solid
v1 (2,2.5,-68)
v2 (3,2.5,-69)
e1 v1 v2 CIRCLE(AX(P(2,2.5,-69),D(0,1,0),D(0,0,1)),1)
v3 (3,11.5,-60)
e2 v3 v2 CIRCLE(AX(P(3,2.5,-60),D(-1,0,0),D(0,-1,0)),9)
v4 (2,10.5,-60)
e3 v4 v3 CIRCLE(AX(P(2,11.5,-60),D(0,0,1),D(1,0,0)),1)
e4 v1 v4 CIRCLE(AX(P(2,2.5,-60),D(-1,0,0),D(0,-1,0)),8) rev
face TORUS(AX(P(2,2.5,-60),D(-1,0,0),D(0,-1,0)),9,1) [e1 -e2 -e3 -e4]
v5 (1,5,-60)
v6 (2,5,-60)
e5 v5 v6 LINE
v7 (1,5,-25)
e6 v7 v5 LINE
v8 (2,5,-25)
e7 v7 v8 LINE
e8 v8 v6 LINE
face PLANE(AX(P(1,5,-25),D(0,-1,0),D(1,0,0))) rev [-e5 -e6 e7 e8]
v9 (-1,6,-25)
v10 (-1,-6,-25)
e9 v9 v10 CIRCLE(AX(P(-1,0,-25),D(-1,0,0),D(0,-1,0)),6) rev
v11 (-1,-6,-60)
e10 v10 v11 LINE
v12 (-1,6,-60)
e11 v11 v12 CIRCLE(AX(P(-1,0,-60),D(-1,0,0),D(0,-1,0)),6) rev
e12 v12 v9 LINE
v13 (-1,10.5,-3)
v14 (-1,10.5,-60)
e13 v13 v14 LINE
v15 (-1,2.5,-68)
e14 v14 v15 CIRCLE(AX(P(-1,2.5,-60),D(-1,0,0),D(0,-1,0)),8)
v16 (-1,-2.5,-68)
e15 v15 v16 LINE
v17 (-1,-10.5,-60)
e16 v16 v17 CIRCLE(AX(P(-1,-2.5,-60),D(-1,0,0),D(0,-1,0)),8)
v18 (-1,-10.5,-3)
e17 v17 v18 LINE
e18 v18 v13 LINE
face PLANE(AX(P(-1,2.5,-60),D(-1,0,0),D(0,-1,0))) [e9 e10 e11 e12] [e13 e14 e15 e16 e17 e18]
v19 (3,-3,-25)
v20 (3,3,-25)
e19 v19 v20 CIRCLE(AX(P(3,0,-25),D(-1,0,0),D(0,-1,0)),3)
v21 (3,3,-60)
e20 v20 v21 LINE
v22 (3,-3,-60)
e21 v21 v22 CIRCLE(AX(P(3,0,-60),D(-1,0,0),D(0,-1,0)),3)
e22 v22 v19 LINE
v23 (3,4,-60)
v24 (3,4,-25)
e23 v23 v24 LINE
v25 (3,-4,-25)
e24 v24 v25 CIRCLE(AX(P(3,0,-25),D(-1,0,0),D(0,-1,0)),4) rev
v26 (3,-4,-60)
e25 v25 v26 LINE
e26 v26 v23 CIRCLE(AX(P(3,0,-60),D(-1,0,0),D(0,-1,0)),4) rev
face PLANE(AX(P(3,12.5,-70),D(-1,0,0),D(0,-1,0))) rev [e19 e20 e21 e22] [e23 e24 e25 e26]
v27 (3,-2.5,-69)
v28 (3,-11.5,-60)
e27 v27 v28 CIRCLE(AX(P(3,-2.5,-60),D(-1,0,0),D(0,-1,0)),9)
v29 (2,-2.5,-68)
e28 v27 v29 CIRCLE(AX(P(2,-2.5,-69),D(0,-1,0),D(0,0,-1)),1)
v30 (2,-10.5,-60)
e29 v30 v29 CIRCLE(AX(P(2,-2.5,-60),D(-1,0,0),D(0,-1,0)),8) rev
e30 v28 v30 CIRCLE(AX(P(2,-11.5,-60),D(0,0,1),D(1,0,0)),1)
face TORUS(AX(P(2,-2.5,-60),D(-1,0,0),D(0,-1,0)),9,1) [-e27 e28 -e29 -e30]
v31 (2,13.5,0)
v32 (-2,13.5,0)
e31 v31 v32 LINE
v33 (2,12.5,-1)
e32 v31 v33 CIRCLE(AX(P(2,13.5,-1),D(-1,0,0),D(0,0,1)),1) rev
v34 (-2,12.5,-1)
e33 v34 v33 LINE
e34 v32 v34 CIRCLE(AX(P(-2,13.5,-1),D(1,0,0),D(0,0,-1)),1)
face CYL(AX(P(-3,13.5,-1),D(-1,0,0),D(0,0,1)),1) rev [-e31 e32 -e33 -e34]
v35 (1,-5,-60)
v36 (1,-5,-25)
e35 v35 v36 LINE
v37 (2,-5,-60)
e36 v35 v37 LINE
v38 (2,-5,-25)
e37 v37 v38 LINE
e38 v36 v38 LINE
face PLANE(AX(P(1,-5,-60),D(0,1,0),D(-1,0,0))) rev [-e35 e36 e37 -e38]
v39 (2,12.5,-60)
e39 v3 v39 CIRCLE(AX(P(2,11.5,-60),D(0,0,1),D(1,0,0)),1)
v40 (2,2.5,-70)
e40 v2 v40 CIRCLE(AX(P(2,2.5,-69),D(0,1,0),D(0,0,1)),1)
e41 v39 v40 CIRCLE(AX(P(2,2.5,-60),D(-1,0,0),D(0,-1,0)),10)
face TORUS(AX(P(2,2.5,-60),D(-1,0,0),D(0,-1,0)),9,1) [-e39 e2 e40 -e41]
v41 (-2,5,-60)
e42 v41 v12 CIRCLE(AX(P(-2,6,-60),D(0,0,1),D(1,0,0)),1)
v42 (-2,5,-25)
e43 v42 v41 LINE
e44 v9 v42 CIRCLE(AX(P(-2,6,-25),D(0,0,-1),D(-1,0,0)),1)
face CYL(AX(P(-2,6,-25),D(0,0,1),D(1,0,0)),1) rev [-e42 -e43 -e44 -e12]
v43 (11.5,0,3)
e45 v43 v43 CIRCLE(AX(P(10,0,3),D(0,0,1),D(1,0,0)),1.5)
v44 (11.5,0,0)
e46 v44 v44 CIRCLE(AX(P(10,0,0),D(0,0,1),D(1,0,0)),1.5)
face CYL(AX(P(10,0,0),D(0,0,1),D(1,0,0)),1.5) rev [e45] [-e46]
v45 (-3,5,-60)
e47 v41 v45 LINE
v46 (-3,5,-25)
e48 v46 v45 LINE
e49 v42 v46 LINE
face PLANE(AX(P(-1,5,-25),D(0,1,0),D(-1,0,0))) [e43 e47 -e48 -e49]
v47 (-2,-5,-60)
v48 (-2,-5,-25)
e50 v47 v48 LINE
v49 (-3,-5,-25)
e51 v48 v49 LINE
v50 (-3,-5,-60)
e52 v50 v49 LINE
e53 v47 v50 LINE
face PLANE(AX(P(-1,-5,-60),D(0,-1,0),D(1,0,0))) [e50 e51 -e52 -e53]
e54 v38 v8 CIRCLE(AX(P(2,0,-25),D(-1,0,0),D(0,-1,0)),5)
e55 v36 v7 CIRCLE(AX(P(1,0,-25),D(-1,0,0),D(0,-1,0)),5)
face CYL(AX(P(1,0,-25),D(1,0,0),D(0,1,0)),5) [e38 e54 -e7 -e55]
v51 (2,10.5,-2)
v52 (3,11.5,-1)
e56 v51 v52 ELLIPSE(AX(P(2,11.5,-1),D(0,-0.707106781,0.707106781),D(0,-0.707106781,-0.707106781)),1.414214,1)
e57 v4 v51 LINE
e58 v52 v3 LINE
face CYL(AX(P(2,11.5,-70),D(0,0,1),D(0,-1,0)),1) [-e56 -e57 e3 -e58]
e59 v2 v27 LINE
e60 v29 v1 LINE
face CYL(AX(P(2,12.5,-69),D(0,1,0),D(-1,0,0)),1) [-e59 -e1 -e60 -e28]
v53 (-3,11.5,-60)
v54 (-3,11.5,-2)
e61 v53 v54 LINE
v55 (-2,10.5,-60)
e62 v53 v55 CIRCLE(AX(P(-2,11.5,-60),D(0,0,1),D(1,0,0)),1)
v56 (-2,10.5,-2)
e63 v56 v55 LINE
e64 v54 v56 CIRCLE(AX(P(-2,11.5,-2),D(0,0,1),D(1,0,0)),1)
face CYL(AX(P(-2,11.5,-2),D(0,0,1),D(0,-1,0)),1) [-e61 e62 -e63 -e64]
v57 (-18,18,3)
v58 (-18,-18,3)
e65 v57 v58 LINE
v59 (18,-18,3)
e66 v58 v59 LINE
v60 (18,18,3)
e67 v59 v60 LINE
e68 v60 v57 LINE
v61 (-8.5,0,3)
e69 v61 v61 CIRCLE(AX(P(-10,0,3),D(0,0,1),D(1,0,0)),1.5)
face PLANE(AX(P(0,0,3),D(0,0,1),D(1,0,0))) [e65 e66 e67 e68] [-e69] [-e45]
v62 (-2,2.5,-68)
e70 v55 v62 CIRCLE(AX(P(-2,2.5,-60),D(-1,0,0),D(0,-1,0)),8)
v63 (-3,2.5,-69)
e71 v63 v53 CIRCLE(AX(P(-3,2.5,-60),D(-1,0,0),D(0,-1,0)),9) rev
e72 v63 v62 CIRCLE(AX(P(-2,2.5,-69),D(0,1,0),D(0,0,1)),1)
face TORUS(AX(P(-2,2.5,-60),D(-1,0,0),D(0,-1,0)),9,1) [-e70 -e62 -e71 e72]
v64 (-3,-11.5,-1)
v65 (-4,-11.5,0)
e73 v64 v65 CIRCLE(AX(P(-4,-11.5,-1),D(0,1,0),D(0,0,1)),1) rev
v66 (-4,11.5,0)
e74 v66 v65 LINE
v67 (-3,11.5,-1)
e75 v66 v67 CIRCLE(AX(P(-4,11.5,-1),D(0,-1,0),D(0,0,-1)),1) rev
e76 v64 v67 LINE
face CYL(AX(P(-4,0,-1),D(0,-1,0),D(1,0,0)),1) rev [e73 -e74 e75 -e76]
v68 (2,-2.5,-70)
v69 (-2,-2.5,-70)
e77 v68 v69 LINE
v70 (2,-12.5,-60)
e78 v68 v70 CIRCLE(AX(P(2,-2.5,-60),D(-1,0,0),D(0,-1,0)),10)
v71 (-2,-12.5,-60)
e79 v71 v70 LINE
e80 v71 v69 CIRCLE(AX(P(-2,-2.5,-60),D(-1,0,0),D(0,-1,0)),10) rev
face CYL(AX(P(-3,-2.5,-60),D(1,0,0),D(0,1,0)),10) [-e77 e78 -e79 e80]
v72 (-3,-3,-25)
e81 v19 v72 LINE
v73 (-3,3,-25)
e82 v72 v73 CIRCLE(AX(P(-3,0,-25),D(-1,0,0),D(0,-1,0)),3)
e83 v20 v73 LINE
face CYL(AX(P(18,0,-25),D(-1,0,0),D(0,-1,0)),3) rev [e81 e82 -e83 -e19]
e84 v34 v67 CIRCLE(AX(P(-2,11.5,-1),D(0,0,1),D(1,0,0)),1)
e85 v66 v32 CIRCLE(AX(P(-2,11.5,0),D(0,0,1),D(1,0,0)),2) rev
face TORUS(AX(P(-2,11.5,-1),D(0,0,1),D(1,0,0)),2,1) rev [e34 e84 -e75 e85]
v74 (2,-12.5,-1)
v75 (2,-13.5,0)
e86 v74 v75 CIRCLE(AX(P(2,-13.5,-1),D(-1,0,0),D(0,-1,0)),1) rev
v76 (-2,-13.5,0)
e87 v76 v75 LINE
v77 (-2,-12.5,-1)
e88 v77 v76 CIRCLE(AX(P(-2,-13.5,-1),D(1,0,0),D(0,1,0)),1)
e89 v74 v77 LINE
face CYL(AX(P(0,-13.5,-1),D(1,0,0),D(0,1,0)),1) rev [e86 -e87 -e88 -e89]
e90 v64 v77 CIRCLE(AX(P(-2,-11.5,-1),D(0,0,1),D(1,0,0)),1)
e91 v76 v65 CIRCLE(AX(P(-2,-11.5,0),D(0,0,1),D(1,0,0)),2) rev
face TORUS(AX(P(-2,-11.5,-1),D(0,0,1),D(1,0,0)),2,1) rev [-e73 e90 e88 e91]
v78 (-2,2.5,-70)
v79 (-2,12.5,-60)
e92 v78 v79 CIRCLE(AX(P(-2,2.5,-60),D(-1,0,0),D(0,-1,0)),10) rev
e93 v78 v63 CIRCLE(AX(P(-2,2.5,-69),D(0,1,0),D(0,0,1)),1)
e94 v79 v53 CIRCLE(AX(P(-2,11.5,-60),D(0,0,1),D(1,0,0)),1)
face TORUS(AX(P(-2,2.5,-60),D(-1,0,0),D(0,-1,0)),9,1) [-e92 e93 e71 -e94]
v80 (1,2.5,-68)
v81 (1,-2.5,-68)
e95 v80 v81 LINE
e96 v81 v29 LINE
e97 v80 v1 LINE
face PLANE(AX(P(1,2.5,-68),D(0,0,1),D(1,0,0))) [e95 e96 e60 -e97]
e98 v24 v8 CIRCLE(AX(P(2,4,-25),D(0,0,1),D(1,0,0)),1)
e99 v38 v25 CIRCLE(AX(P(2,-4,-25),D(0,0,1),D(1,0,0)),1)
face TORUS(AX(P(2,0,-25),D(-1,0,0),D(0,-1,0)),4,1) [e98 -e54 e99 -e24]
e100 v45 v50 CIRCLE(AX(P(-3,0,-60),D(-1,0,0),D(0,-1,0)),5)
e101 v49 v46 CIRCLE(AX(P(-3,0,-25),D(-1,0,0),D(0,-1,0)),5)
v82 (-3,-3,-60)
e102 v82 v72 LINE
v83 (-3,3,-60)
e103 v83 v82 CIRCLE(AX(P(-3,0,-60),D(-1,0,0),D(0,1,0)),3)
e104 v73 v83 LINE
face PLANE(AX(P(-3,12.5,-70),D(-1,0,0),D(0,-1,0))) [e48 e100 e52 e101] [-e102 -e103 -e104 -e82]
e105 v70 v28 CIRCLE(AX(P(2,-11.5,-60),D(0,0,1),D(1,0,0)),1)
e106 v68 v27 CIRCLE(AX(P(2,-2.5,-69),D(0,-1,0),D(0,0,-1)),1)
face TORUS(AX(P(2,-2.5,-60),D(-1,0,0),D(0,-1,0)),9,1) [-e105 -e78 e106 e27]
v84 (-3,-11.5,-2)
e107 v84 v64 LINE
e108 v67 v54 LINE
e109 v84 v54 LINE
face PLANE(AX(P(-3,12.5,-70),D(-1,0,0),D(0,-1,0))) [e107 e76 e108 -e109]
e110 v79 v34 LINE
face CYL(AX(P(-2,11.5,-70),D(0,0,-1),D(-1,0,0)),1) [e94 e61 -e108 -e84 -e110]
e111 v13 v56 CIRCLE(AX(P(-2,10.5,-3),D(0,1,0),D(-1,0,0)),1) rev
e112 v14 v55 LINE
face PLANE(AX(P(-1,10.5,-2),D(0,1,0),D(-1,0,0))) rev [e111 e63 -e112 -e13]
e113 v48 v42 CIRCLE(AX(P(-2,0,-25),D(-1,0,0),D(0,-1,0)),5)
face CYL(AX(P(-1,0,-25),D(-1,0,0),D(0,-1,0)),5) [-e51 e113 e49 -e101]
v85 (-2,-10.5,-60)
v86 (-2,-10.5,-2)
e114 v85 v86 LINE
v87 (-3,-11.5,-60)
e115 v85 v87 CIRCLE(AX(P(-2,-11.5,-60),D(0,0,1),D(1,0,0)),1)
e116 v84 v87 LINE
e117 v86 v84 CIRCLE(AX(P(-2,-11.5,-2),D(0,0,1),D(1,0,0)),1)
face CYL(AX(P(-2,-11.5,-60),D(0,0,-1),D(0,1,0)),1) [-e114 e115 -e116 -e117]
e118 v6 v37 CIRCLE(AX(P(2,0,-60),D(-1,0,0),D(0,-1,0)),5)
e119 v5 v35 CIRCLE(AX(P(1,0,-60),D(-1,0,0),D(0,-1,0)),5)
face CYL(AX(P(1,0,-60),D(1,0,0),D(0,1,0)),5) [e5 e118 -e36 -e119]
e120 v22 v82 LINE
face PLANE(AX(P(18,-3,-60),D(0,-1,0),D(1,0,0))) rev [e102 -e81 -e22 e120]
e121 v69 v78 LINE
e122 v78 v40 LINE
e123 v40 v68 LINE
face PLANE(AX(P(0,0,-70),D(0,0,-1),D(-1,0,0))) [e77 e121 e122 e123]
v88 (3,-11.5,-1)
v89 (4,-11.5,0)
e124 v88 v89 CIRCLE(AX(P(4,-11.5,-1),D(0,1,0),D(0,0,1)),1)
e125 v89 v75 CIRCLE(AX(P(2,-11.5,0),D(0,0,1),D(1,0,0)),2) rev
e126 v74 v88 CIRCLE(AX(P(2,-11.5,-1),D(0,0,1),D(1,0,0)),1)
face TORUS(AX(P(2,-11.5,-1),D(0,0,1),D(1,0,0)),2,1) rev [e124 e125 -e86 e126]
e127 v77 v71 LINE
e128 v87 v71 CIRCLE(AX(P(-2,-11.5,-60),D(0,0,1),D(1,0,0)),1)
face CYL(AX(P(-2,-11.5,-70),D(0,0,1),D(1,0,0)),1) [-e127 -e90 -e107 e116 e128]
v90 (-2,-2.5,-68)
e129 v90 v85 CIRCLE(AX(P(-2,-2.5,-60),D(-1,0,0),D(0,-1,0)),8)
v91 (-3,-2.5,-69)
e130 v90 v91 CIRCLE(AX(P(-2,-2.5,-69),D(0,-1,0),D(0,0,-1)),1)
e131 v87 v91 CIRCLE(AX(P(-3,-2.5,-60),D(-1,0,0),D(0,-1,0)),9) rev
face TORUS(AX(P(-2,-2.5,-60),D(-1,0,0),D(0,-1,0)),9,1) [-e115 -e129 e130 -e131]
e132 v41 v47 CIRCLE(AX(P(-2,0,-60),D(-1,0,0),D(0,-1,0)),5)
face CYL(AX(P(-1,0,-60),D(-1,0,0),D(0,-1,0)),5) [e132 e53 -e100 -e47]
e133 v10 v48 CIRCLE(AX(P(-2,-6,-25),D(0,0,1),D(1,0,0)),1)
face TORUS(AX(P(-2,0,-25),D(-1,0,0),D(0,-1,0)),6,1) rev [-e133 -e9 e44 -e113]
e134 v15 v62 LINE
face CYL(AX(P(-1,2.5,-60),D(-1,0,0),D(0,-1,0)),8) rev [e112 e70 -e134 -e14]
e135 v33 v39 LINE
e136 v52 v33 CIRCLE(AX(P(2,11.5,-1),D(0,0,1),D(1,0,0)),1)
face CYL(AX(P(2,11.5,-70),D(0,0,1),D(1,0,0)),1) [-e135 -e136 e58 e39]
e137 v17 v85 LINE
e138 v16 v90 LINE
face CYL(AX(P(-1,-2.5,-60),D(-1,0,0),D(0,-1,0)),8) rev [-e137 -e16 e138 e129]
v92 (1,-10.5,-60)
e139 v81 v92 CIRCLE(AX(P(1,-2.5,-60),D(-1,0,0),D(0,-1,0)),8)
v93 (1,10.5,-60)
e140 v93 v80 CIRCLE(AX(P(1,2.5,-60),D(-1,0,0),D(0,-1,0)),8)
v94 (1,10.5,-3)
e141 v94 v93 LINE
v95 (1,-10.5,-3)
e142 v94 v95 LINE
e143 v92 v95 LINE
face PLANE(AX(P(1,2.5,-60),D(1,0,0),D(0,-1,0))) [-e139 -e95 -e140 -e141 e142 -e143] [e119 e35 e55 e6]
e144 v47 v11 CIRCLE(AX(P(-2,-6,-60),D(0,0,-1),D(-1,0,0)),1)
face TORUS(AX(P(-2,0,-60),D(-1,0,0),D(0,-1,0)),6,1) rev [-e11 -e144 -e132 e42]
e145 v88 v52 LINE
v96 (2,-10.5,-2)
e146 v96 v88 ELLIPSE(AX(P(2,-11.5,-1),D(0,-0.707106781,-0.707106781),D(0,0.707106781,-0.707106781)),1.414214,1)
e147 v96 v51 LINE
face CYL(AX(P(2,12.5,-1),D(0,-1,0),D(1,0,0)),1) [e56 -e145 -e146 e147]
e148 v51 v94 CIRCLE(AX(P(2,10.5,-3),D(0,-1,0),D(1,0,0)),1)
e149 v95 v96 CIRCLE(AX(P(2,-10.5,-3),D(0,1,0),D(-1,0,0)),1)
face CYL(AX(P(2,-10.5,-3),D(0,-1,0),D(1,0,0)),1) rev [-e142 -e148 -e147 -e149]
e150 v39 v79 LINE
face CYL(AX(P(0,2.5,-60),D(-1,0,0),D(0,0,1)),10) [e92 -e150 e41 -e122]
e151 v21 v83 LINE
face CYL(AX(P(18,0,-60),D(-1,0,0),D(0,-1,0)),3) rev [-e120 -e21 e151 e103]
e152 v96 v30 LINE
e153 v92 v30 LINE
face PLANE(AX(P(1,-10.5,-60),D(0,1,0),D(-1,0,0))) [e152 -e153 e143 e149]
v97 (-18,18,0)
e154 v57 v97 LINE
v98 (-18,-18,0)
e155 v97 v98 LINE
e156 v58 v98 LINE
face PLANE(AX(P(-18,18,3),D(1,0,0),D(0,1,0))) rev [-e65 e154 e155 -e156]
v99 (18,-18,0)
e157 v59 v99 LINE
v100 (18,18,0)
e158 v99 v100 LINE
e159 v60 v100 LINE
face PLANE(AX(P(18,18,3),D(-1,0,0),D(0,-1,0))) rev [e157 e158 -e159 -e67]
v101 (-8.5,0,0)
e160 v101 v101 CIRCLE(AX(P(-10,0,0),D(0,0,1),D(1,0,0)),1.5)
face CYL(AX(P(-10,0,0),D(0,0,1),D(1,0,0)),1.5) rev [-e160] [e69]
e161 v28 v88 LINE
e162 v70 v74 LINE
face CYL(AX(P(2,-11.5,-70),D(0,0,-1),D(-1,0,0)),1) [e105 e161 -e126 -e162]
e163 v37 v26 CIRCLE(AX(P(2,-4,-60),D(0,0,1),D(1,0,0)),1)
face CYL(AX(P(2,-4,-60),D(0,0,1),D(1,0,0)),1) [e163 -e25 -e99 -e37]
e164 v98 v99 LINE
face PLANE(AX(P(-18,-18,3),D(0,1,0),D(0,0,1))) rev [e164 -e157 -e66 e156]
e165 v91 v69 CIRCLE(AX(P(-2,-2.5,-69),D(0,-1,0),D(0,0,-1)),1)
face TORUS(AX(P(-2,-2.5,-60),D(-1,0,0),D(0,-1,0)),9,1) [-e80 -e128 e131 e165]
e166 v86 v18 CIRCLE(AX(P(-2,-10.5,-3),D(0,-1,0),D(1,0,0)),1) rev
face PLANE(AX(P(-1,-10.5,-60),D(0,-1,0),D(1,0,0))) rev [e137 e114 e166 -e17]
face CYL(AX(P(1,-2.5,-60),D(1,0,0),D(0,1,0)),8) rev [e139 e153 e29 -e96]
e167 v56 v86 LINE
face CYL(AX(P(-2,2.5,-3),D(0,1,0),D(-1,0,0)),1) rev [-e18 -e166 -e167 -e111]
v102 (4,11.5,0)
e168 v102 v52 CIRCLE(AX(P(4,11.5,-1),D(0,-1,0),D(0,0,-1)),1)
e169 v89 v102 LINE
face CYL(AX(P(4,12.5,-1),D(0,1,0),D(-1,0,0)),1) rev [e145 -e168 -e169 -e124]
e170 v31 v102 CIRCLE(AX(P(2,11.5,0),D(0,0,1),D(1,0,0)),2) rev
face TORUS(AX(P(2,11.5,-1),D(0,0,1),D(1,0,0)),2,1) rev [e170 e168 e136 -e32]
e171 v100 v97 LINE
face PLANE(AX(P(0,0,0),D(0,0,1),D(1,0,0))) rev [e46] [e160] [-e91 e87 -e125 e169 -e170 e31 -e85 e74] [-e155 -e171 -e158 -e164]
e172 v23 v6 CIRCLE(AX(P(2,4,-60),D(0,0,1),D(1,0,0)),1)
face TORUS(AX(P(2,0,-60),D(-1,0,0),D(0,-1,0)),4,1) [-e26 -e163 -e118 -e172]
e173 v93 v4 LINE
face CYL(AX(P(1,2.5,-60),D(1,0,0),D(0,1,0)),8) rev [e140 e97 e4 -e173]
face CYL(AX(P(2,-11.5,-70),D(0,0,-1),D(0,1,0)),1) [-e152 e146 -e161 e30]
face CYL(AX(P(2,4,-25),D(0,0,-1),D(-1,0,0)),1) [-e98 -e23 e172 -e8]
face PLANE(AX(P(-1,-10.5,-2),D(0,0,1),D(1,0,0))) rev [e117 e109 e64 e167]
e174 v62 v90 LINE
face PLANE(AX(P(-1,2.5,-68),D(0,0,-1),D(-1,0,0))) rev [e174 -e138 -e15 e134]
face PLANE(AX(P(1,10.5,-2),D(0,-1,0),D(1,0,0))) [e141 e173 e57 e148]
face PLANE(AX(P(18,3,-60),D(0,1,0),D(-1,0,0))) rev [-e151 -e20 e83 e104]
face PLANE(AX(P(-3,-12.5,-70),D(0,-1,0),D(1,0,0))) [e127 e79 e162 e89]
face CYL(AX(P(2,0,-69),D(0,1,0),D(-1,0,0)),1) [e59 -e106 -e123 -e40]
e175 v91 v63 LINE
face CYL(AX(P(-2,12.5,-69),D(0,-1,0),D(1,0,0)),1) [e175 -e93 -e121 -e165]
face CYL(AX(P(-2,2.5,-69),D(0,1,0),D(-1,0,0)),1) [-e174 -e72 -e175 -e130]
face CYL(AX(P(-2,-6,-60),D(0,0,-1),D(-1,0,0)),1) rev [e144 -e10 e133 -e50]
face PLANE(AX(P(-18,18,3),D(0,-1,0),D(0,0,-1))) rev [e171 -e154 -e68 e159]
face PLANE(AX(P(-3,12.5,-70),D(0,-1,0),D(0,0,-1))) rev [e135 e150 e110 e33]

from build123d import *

# Parameters (mm, degrees)
SKETCH1_W           = 36
SKETCH1_H           = 36
BOSS_EXTRUDE1_DEPTH = 3
SKETCH2_R           = 1.5
CUT_EXTRUDE1_DEPTH  = 26.632011236
SKETCH3_W           = 6
SKETCH3_H           = 25
BOSS_EXTRUDE2_DEPTH = 70
FILLET1_R           = 10
CUT_EXTRUDE2_DEPTH  = 76.266194271
CUT_EXTRUDE3_DEPTH  = 2
FILLET2_R           = 1


with BuildPart() as part:
    # Sketch1 → Boss-Extrude1 (new body)
    with BuildSketch(Plane.XY):
        Rectangle(SKETCH1_W, SKETCH1_H)
    extrude(amount=BOSS_EXTRUDE1_DEPTH)

    # Sketch2 → Cut-Extrude1 (cut, through all)
    with BuildSketch(Plane.XY.offset(3)):
        with Locations((-10, 0)):
            Circle(SKETCH2_R)
        with Locations((10, 0)):
            Circle(SKETCH2_R)
    extrude(amount=-CUT_EXTRUDE1_DEPTH, mode=Mode.SUBTRACT)

    # Sketch3 → Boss-Extrude2 (add)
    with BuildSketch(Plane(origin=(0, 0, 0), x_dir=(-1, 0, 0), z_dir=(0, 0, -1))):
        Rectangle(SKETCH3_W, SKETCH3_H)
    extrude(amount=BOSS_EXTRUDE2_DEPTH)

    # Fillet1
    fillet1_edges = [part.edges().sort_by_distance(p)[0] for p in [
        (0, -12.5, -70),
        (0, 12.5, -70),
    ]]
    fillet(fillet1_edges, radius=FILLET1_R)

    # Sketch4 → Cut-Extrude2 (cut, through all)
    with BuildSketch(Plane.ZY.offset(3)):
        with BuildLine():
            Line((-60, -3), (-25, -3))
            ThreePointArc((-25, -3), (-22, 0), (-25, 3))
            Line((-25, 3), (-60, 3))
            ThreePointArc((-60, 3), (-63, 0), (-60, -3))
        make_face()
    extrude(amount=-CUT_EXTRUDE2_DEPTH, mode=Mode.SUBTRACT)

    # Sketch6 → Cut-Extrude3 (cut)
    with BuildSketch(Plane.ZY.offset(3)):
        with BuildLine():
            Line((-2, -10.5), (-2, 10.5))
            Line((-2, 10.5), (-60, 10.5))
            ThreePointArc((-60, 10.5), (-65.656854249, 8.156854249), (-68, 2.5))
            Line((-68, 2.5), (-68, -2.5))
            ThreePointArc((-68, -2.5), (-65.656854249, -8.156854249), (-60, -10.5))
            Line((-60, -10.5), (-2, -10.5))
        make_face()
        with BuildLine():
            Line((-60, -5), (-25, -5))
            ThreePointArc((-25, -5), (-20, 0), (-25, 5))
            Line((-25, 5), (-60, 5))
            ThreePointArc((-60, 5), (-65, 0), (-60, -5))
        make_face(mode=Mode.SUBTRACT)
    cut_extrude3 = extrude(amount=-CUT_EXTRUDE3_DEPTH, mode=Mode.SUBTRACT)

    # Mirror1: Cut-Extrude3 across plane
    add(cut_extrude3.mirror(Plane(origin=(0, 0, 0), x_dir=(0, 0, 1), z_dir=(1, 0, 0))), mode=Mode.SUBTRACT)

    # Fillet2
    fillet2_edges = [part.edges().sort_by_distance(p)[0] for p in [
        (-3, 0, 0),
        (0, 12.5, 0),
        (0, -12.5, 0),
        (-1, -5, -42.5),
        (-1, 0, -65),
        (-1, 5, -42.5),
        (-3, 12.5, -30),
        (-3, -12.5, -30),
        (-3, -9.571067812, -67.071067812),
        (-3, 0, -70),
        (-3, 10.5, -31),
        (-3, 8.156854249, -65.656854249),
        (-3, 0, -68),
        (-3, -10.5, -31),
        (3, 12.5, -30),
        (3, 9.571067812, -67.071067812),
        (3, 0, -70),
        (3, -9.571067812, -67.071067812),
        (3, 0, -20),
        (3, -5, -42.5),
        (3, 0, -65),
        (3, -10.5, -31),
        (3, -8.156854249, -65.656854249),
        (3, 0, -68),
        (3, 8.156854249, -65.656854249),
        (-1, 0, -2),
        (-1, 0, -20),
        (-3, 9.571067812, -67.071067812),
        (-3, -8.156854249, -65.656854249),
        (3, -12.5, -30),
        (3, 0, 0),
        (3, 0, -2),
        (1, 0, -2),
        (3, 5, -42.5),
        (3, 10.5, -31),
    ]]
    fillet(fillet2_edges, radius=FILLET2_R - 0.0001)  # a hair under: the kernel refuses the full size


solid = part.part
